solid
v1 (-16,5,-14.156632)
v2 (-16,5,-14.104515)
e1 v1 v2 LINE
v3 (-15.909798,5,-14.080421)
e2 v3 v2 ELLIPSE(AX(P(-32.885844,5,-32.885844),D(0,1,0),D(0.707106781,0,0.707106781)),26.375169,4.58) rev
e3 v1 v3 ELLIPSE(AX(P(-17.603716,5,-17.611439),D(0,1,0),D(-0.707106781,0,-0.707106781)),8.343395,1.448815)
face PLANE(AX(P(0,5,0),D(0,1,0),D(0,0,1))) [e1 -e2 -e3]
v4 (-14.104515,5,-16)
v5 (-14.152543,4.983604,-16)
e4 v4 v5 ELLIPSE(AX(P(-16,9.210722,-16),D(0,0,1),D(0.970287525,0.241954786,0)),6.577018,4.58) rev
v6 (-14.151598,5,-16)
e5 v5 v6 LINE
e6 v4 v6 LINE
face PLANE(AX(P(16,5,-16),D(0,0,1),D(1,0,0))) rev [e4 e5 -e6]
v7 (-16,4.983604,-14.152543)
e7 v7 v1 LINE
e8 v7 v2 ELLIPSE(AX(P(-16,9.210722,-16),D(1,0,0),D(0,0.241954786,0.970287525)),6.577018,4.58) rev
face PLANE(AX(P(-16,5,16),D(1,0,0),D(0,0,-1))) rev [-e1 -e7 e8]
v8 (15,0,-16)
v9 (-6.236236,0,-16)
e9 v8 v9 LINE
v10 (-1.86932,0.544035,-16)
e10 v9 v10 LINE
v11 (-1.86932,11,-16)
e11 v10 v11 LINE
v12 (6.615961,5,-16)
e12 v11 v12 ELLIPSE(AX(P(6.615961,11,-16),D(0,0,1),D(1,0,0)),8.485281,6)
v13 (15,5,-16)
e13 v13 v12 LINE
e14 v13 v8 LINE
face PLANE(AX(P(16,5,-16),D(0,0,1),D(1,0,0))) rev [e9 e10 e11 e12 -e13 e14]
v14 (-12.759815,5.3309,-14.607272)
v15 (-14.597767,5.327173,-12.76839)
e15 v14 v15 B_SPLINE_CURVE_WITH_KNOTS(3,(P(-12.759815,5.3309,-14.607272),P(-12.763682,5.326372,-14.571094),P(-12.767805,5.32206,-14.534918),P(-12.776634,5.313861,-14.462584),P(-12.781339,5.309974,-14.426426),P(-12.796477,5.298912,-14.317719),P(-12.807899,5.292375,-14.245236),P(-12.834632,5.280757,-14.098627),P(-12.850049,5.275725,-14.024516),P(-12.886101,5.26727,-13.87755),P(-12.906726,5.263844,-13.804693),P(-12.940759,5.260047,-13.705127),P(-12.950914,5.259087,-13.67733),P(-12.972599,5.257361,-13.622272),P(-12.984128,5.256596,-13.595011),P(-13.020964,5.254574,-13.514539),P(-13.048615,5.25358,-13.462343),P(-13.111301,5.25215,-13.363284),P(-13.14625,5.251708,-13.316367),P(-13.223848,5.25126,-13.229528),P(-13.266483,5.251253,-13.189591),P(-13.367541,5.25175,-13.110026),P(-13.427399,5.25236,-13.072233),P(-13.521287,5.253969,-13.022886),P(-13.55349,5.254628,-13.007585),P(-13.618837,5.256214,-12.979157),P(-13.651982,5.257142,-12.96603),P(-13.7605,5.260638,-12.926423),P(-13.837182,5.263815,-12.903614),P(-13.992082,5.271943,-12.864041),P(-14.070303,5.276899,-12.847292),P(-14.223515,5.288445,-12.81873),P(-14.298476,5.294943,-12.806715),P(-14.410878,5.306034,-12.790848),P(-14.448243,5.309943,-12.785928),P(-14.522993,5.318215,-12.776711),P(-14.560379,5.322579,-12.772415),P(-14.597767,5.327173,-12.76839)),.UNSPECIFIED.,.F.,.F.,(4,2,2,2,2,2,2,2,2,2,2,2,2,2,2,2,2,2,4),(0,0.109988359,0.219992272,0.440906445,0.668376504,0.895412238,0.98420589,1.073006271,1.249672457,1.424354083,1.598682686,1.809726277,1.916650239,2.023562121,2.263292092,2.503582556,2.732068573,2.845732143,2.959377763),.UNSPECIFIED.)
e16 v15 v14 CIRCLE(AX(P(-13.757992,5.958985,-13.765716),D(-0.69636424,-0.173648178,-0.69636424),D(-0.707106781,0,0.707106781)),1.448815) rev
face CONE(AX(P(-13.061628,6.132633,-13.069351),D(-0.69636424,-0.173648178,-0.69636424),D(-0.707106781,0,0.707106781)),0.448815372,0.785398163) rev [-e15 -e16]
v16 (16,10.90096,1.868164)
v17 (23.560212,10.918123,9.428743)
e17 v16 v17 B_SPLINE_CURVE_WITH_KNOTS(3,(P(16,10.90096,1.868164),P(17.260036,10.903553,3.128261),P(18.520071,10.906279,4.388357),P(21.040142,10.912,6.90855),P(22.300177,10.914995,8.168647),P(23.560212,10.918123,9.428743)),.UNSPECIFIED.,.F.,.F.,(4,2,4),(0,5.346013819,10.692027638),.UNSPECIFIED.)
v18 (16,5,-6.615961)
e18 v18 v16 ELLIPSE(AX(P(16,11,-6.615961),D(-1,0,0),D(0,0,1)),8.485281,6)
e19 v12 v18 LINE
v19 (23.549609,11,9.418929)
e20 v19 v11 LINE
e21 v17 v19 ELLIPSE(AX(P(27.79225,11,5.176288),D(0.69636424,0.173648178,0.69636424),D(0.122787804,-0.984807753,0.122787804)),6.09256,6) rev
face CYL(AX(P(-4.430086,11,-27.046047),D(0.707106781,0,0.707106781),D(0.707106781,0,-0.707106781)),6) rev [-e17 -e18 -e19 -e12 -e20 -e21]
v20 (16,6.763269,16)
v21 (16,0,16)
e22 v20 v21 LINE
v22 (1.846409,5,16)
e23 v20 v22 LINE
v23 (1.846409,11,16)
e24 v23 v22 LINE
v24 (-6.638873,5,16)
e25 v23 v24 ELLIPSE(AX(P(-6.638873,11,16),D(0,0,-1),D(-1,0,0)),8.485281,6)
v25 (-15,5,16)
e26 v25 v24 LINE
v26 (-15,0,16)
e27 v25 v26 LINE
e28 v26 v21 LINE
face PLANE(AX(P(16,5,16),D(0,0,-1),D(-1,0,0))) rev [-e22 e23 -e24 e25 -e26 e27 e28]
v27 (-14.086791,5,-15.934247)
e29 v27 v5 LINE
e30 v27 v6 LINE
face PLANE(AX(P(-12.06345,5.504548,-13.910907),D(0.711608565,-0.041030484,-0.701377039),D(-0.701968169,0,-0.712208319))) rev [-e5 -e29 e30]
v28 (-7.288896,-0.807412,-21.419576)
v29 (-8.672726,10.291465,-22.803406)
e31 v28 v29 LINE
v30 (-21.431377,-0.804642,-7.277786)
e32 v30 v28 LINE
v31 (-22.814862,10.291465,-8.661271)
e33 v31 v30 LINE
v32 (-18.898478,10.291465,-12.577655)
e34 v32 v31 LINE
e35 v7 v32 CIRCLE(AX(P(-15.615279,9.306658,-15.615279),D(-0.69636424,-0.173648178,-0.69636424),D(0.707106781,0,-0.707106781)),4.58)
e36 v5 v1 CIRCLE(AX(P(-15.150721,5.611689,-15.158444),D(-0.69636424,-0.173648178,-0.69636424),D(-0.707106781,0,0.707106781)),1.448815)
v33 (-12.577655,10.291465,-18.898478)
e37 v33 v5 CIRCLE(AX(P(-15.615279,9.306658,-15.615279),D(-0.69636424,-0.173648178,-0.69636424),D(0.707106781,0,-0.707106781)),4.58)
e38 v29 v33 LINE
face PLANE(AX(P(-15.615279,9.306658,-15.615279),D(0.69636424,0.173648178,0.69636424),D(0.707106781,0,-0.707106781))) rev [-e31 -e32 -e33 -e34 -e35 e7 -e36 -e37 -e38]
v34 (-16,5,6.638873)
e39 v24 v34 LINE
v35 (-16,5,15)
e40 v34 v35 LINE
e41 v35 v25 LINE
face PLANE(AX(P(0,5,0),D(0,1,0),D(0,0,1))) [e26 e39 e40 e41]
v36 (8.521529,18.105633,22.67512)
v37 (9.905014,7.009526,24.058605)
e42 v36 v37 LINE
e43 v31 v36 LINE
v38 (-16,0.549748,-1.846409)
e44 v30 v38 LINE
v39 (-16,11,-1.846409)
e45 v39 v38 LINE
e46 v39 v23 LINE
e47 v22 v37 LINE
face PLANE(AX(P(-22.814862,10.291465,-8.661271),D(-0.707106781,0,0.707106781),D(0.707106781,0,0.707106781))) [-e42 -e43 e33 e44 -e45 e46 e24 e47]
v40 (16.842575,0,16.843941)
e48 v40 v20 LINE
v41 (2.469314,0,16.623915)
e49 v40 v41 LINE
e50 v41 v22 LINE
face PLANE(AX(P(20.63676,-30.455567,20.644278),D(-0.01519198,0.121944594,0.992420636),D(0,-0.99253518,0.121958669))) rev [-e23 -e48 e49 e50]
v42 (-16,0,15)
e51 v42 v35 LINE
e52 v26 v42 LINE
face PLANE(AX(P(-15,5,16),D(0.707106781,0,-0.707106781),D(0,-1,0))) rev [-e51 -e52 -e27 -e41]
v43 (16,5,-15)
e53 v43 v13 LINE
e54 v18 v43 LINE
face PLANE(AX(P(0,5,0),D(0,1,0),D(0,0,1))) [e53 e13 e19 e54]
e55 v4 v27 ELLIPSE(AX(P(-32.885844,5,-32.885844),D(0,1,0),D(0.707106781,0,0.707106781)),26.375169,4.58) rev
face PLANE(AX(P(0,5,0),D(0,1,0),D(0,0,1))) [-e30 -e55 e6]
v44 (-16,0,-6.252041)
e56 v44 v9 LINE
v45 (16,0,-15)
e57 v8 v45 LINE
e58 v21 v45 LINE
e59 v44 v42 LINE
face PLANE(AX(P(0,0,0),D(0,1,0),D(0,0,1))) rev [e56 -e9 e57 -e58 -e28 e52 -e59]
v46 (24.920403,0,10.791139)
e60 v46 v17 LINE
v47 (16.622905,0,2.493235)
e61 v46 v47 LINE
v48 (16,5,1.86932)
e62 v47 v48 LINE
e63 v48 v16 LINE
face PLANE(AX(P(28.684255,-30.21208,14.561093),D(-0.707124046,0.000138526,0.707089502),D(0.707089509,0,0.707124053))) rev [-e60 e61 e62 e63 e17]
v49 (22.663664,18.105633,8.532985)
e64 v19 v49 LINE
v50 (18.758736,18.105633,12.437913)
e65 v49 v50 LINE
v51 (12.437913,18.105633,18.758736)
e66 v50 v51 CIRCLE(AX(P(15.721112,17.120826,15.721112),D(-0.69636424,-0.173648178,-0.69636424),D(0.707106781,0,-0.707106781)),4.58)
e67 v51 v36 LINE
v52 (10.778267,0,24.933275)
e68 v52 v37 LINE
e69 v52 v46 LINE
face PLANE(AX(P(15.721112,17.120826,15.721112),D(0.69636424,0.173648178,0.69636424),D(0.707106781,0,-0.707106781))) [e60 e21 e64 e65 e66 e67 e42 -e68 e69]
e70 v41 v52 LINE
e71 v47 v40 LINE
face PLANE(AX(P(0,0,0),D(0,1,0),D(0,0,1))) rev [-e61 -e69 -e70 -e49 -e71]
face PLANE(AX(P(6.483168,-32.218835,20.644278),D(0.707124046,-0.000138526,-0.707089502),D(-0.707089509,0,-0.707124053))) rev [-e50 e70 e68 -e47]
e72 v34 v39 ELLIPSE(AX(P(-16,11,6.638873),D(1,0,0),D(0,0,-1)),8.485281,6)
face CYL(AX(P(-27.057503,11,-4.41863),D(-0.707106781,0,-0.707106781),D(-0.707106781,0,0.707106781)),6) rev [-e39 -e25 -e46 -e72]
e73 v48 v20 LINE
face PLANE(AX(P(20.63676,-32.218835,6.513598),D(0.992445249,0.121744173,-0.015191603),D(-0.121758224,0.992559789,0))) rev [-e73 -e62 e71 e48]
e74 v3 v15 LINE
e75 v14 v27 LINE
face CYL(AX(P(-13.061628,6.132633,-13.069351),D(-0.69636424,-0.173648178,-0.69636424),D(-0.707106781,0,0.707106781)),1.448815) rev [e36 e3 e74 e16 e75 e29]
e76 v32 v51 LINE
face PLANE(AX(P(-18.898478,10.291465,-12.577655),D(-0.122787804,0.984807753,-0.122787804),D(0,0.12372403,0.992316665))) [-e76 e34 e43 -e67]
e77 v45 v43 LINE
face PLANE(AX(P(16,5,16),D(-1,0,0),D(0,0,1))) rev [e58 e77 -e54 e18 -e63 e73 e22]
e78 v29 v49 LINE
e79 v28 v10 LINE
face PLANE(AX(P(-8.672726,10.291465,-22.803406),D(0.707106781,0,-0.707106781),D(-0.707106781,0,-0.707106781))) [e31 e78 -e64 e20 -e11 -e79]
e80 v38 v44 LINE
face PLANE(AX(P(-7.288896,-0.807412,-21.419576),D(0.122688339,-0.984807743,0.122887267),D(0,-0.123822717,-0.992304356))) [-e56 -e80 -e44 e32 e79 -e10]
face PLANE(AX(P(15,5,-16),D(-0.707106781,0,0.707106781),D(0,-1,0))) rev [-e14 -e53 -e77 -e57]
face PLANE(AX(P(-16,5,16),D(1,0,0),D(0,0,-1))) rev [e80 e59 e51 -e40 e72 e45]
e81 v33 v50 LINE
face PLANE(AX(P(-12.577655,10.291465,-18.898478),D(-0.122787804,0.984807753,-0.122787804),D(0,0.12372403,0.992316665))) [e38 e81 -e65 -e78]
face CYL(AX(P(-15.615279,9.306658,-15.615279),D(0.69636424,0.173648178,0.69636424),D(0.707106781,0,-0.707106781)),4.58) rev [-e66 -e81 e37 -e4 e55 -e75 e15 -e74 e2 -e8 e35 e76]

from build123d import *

# Parameters (mm, degrees)
SKETCH1_W                = 32
SKETCH1_H                = 32
BOSS_EXTRUDE1_DEPTH      = 5
BOSS_EXTRUDE2_DEPTH      = 24
BOSS_EXTRUDE2_DEPTH_BACK = 21
SKETCH3_W                = 21.632810856
SKETCH3_H                = 9.374415515
CUT_EXTRUDE1_DEPTH       = 26
CUT_EXTRUDE3_DEPTH       = 3
BOSS_EXTRUDE3_REACH      = 38.453
BOSS_EXTRUDE4_REACH      = 39.779
CHAMFER2_SIZE            = 1
FILLET3_R                = 6
CHAMFER3_SIZE            = 1


with BuildPart() as part:
    # Sketch1 → Boss-Extrude1 (new body)
    with BuildSketch(Plane(origin=(0, 0, 0), x_dir=(1, 0, 0), z_dir=(0, 1, 0))):
        Rectangle(SKETCH1_W, SKETCH1_H)
    extrude(amount=BOSS_EXTRUDE1_DEPTH)

    # Sketch2 → Boss-Extrude2 (add, two sides: drawn at the far end of the back side and taken through both)
    with BuildSketch(Plane(origin=(0.604611907, 0.150768448, 0.604611907), x_dir=(0.7071067811865476, 0, -0.7071067811865476), z_dir=(0.6963642403200193, 0.17364817766692736, 0.6963642403200193)).offset(-BOSS_EXTRUDE2_DEPTH_BACK)):
        with BuildLine():
            Line((-4.469496616, 14), (-10.008100473, 14))
            Line((-10.008100473, 14), (-10.008100473, 2.732717447))
            Line((-10.008100473, 2.732717447), (9.991899527, 2.729904182))
            Line((9.991899527, 2.729904182), (9.991899527, 14))
            Line((9.991899527, 14), (4.469496616, 14))
            ThreePointArc((4.469496616, 14), (0, 8.42), (-4.469496616, 14))
        make_face()
    extrude(amount=BOSS_EXTRUDE2_DEPTH + BOSS_EXTRUDE2_DEPTH_BACK)

    # Sketch3 → Cut-Extrude1 (cut)
    with BuildSketch(Plane(origin=(-14.01903714, -3.495843283, -14.01903714), x_dir=(-0.6756735354111862, -0.16848866057223583, 0.7176885430348756), z_dir=(-0.6963642403200194, -0.17364817766692736, -0.6963642403200193))):
        with Locations((-1.423401453, 7.396880279)):
            Rectangle(SKETCH3_W, SKETCH3_H)
    extrude(amount=CUT_EXTRUDE1_DEPTH, mode=Mode.SUBTRACT)

    # Sketch4 → Cut-Extrude3 (cut)
    with BuildSketch(Plane(origin=(-14.01903714, -3.495843283, -14.01903714), x_dir=(-0.6756735354111862, -0.16848866057223583, 0.7176885430348756), z_dir=(-0.6963642403200194, -0.17364817766692736, -0.6963642403200193))):
        with BuildLine():
            Line((-2.760198528, 8.259804018), (-2.791216986, 8.402799894))
            Line((-2.791216986, 8.402799894), (-0.222019538, 8.960106488))
            Line((-0.222019538, 8.960106488), (-0.191719193, 8.722714198))
            ThreePointArc((-0.191719193, 8.722714198), (-1.330630481, 7.684897625), (-2.760198528, 8.259804018))
        make_face()
    extrude(amount=-CUT_EXTRUDE3_DEPTH, mode=Mode.SUBTRACT)

    # Boss-Extrude3: up to this face of the body (flat: up to its plane)
    boss_extrude3_end = Plane(part.part.faces().sort_by_distance((12.948102595, 6.004070548, 12.962810253))[0])
    # Sketch5 → Boss-Extrude3 (add, up to the picked face)
    with BuildSketch(Plane(origin=(0, 5, 0), x_dir=(1, 0, 0), z_dir=(0, 1, 0)), mode=Mode.PRIVATE) as boss_extrude3_sk1:
        Polygon((16, -1.869320176), (1.846408577, -16), (16, -16), align=None)
    boss_extrude3_tool1 = split(extrude(boss_extrude3_sk1.sketch, amount=BOSS_EXTRUDE3_REACH, mode=Mode.PRIVATE), bisect_by=boss_extrude3_end, keep=Keep.BOTH, mode=Mode.PRIVATE)
    add(boss_extrude3_tool1.solids().sort_by(Axis((11.282136, 5, 11.289773), (0, 1, 0)))[0])

    # Boss-Extrude4: up to this plane
    boss_extrude4_end = Plane(origin=(0, 0, 0), z_dir=(0, 1, 0))
    # Sketch6 → Boss-Extrude4 (add, up to the surface)
    with BuildSketch(Plane(origin=(-0.335099844, 2.689814891, -0.335643177), x_dir=(0.992445248624536, 0.12174417303820455, -0.015191603398808283), z_dir=(0.12268833882070036, -0.9848077432694324, 0.12288726668774345)), mode=Mode.PRIVATE) as boss_extrude4_sk1:
        Polygon((2.19811463, 16.495983278), (10.318063839, 24.741397108), (24.568201142, 10.708094048), (16.459446872, 2.474048136), (16.459446872, 16.714315992), align=None)
    boss_extrude4_tool1 = split(extrude(boss_extrude4_sk1.sketch, amount=BOSS_EXTRUDE4_REACH, mode=Mode.PRIVATE), bisect_by=boss_extrude4_end, keep=Keep.BOTH, mode=Mode.PRIVATE)
    add(boss_extrude4_tool1.solids().sort_by_distance((6.098904, 6.004719, 19.80612))[0])

    # Chamfer2
    # the kernel refuses this chamfer: 1 mm, written as the material it adds along each edge
    with BuildSketch(Plane(origin=(-13.061628157, 6.132633274, -13.069351365), x_dir=(-0.29592354594657705, 0.9534387650849755, 0.05817023455033625), z_dir=(0.6538395061159328, 0.2465782464577767, -0.7153272458224147))) as chamfer2_piece_1_section:
        Polygon((1.448815372, -CHAMFER2_SIZE), (1.448815372 - CHAMFER2_SIZE, 0), (1.448815372, 0), align=None)
    chamfer2_piece_1 = revolve(axis=Axis((-13.061628157, 6.132633274, -13.069351365), (0.6963642403200193, 0.17364817766692733, 0.6963642403200193)), revolution_arc=331.166542544, mode=Mode.PRIVATE)
    chamfer2_piece_1 = chamfer2_piece_1 - Plane(origin=(-13.810185227, 9.756782822, -13.810185227), x_dir=(0.6632365855153953, 0.21502352685856047, -0.7168557138861248), z_dir=(-0.6963642403200193, -0.1736481776669273, -0.6963642403200193)) * Cylinder(4.58, 6, mode=Mode.PRIVATE)
    add(chamfer2_piece_1)

    # Fillet3
    # the kernel refuses this fillet: 6 mm, written as the material it adds along each edge
    with BuildSketch(Plane(origin=(26.606601718, 5, 12.475921893), x_dir=(0, 1, 0), z_dir=(-0.7071067811865475, 0, -0.7071067811865476))) as fillet3_piece_1_section:
        with BuildLine():
            CenterArc((FILLET3_R, FILLET3_R), FILLET3_R, 180, 90)
            Line((0, FILLET3_R), (0, 0))
            Line((0, 0), (FILLET3_R, 0))
        make_face()
    fillet3_piece_1 = extrude(amount=55.271034943, mode=Mode.PRIVATE)
    fillet3_piece_1 = split(fillet3_piece_1, bisect_by=Plane(origin=(7.920941569, 6.446020655, -16), z_dir=(0, 0, 1)), keep=Keep.TOP, mode=Mode.PRIVATE)
    fillet3_piece_1 = split(fillet3_piece_1, bisect_by=Plane(origin=(16, 6.446020655, -7.920941569), z_dir=(-1, 0, 0)), keep=Keep.TOP, mode=Mode.PRIVATE)
    add(fillet3_piece_1)
    with BuildSketch(Plane(origin=(-26.606601718, 5, -12.453010295), x_dir=(0, 1, 0), z_dir=(0.7071067811865475, 0, 0.7071067811865476))) as fillet3_piece_2_section:
        with BuildLine():
            CenterArc((FILLET3_R, FILLET3_R), FILLET3_R, 180, 90)
            Line((0, FILLET3_R), (0, 0))
            Line((0, 0), (FILLET3_R, 0))
        make_face()
    fillet3_piece_2 = extrude(amount=55.238633049, mode=Mode.PRIVATE)
    fillet3_piece_2 = split(fillet3_piece_2, bisect_by=Plane(origin=(-16, 6.446146756, 7.932246434), z_dir=(1, 0, 0)), keep=Keep.TOP, mode=Mode.PRIVATE)
    fillet3_piece_2 = split(fillet3_piece_2, bisect_by=Plane(origin=(-7.932246434, 6.446146756, 16), z_dir=(0, 0, -1)), keep=Keep.TOP, mode=Mode.PRIVATE)
    add(fillet3_piece_2)

    # Chamfer3
    chamfer3_edges = [part.edges().sort_by_distance(p)[0] for p in [
        (16, 2.5, -16),
        (-16, 2.5, 16),
    ]]
    chamfer(chamfer3_edges, length=CHAMFER3_SIZE)


solid = part.part
